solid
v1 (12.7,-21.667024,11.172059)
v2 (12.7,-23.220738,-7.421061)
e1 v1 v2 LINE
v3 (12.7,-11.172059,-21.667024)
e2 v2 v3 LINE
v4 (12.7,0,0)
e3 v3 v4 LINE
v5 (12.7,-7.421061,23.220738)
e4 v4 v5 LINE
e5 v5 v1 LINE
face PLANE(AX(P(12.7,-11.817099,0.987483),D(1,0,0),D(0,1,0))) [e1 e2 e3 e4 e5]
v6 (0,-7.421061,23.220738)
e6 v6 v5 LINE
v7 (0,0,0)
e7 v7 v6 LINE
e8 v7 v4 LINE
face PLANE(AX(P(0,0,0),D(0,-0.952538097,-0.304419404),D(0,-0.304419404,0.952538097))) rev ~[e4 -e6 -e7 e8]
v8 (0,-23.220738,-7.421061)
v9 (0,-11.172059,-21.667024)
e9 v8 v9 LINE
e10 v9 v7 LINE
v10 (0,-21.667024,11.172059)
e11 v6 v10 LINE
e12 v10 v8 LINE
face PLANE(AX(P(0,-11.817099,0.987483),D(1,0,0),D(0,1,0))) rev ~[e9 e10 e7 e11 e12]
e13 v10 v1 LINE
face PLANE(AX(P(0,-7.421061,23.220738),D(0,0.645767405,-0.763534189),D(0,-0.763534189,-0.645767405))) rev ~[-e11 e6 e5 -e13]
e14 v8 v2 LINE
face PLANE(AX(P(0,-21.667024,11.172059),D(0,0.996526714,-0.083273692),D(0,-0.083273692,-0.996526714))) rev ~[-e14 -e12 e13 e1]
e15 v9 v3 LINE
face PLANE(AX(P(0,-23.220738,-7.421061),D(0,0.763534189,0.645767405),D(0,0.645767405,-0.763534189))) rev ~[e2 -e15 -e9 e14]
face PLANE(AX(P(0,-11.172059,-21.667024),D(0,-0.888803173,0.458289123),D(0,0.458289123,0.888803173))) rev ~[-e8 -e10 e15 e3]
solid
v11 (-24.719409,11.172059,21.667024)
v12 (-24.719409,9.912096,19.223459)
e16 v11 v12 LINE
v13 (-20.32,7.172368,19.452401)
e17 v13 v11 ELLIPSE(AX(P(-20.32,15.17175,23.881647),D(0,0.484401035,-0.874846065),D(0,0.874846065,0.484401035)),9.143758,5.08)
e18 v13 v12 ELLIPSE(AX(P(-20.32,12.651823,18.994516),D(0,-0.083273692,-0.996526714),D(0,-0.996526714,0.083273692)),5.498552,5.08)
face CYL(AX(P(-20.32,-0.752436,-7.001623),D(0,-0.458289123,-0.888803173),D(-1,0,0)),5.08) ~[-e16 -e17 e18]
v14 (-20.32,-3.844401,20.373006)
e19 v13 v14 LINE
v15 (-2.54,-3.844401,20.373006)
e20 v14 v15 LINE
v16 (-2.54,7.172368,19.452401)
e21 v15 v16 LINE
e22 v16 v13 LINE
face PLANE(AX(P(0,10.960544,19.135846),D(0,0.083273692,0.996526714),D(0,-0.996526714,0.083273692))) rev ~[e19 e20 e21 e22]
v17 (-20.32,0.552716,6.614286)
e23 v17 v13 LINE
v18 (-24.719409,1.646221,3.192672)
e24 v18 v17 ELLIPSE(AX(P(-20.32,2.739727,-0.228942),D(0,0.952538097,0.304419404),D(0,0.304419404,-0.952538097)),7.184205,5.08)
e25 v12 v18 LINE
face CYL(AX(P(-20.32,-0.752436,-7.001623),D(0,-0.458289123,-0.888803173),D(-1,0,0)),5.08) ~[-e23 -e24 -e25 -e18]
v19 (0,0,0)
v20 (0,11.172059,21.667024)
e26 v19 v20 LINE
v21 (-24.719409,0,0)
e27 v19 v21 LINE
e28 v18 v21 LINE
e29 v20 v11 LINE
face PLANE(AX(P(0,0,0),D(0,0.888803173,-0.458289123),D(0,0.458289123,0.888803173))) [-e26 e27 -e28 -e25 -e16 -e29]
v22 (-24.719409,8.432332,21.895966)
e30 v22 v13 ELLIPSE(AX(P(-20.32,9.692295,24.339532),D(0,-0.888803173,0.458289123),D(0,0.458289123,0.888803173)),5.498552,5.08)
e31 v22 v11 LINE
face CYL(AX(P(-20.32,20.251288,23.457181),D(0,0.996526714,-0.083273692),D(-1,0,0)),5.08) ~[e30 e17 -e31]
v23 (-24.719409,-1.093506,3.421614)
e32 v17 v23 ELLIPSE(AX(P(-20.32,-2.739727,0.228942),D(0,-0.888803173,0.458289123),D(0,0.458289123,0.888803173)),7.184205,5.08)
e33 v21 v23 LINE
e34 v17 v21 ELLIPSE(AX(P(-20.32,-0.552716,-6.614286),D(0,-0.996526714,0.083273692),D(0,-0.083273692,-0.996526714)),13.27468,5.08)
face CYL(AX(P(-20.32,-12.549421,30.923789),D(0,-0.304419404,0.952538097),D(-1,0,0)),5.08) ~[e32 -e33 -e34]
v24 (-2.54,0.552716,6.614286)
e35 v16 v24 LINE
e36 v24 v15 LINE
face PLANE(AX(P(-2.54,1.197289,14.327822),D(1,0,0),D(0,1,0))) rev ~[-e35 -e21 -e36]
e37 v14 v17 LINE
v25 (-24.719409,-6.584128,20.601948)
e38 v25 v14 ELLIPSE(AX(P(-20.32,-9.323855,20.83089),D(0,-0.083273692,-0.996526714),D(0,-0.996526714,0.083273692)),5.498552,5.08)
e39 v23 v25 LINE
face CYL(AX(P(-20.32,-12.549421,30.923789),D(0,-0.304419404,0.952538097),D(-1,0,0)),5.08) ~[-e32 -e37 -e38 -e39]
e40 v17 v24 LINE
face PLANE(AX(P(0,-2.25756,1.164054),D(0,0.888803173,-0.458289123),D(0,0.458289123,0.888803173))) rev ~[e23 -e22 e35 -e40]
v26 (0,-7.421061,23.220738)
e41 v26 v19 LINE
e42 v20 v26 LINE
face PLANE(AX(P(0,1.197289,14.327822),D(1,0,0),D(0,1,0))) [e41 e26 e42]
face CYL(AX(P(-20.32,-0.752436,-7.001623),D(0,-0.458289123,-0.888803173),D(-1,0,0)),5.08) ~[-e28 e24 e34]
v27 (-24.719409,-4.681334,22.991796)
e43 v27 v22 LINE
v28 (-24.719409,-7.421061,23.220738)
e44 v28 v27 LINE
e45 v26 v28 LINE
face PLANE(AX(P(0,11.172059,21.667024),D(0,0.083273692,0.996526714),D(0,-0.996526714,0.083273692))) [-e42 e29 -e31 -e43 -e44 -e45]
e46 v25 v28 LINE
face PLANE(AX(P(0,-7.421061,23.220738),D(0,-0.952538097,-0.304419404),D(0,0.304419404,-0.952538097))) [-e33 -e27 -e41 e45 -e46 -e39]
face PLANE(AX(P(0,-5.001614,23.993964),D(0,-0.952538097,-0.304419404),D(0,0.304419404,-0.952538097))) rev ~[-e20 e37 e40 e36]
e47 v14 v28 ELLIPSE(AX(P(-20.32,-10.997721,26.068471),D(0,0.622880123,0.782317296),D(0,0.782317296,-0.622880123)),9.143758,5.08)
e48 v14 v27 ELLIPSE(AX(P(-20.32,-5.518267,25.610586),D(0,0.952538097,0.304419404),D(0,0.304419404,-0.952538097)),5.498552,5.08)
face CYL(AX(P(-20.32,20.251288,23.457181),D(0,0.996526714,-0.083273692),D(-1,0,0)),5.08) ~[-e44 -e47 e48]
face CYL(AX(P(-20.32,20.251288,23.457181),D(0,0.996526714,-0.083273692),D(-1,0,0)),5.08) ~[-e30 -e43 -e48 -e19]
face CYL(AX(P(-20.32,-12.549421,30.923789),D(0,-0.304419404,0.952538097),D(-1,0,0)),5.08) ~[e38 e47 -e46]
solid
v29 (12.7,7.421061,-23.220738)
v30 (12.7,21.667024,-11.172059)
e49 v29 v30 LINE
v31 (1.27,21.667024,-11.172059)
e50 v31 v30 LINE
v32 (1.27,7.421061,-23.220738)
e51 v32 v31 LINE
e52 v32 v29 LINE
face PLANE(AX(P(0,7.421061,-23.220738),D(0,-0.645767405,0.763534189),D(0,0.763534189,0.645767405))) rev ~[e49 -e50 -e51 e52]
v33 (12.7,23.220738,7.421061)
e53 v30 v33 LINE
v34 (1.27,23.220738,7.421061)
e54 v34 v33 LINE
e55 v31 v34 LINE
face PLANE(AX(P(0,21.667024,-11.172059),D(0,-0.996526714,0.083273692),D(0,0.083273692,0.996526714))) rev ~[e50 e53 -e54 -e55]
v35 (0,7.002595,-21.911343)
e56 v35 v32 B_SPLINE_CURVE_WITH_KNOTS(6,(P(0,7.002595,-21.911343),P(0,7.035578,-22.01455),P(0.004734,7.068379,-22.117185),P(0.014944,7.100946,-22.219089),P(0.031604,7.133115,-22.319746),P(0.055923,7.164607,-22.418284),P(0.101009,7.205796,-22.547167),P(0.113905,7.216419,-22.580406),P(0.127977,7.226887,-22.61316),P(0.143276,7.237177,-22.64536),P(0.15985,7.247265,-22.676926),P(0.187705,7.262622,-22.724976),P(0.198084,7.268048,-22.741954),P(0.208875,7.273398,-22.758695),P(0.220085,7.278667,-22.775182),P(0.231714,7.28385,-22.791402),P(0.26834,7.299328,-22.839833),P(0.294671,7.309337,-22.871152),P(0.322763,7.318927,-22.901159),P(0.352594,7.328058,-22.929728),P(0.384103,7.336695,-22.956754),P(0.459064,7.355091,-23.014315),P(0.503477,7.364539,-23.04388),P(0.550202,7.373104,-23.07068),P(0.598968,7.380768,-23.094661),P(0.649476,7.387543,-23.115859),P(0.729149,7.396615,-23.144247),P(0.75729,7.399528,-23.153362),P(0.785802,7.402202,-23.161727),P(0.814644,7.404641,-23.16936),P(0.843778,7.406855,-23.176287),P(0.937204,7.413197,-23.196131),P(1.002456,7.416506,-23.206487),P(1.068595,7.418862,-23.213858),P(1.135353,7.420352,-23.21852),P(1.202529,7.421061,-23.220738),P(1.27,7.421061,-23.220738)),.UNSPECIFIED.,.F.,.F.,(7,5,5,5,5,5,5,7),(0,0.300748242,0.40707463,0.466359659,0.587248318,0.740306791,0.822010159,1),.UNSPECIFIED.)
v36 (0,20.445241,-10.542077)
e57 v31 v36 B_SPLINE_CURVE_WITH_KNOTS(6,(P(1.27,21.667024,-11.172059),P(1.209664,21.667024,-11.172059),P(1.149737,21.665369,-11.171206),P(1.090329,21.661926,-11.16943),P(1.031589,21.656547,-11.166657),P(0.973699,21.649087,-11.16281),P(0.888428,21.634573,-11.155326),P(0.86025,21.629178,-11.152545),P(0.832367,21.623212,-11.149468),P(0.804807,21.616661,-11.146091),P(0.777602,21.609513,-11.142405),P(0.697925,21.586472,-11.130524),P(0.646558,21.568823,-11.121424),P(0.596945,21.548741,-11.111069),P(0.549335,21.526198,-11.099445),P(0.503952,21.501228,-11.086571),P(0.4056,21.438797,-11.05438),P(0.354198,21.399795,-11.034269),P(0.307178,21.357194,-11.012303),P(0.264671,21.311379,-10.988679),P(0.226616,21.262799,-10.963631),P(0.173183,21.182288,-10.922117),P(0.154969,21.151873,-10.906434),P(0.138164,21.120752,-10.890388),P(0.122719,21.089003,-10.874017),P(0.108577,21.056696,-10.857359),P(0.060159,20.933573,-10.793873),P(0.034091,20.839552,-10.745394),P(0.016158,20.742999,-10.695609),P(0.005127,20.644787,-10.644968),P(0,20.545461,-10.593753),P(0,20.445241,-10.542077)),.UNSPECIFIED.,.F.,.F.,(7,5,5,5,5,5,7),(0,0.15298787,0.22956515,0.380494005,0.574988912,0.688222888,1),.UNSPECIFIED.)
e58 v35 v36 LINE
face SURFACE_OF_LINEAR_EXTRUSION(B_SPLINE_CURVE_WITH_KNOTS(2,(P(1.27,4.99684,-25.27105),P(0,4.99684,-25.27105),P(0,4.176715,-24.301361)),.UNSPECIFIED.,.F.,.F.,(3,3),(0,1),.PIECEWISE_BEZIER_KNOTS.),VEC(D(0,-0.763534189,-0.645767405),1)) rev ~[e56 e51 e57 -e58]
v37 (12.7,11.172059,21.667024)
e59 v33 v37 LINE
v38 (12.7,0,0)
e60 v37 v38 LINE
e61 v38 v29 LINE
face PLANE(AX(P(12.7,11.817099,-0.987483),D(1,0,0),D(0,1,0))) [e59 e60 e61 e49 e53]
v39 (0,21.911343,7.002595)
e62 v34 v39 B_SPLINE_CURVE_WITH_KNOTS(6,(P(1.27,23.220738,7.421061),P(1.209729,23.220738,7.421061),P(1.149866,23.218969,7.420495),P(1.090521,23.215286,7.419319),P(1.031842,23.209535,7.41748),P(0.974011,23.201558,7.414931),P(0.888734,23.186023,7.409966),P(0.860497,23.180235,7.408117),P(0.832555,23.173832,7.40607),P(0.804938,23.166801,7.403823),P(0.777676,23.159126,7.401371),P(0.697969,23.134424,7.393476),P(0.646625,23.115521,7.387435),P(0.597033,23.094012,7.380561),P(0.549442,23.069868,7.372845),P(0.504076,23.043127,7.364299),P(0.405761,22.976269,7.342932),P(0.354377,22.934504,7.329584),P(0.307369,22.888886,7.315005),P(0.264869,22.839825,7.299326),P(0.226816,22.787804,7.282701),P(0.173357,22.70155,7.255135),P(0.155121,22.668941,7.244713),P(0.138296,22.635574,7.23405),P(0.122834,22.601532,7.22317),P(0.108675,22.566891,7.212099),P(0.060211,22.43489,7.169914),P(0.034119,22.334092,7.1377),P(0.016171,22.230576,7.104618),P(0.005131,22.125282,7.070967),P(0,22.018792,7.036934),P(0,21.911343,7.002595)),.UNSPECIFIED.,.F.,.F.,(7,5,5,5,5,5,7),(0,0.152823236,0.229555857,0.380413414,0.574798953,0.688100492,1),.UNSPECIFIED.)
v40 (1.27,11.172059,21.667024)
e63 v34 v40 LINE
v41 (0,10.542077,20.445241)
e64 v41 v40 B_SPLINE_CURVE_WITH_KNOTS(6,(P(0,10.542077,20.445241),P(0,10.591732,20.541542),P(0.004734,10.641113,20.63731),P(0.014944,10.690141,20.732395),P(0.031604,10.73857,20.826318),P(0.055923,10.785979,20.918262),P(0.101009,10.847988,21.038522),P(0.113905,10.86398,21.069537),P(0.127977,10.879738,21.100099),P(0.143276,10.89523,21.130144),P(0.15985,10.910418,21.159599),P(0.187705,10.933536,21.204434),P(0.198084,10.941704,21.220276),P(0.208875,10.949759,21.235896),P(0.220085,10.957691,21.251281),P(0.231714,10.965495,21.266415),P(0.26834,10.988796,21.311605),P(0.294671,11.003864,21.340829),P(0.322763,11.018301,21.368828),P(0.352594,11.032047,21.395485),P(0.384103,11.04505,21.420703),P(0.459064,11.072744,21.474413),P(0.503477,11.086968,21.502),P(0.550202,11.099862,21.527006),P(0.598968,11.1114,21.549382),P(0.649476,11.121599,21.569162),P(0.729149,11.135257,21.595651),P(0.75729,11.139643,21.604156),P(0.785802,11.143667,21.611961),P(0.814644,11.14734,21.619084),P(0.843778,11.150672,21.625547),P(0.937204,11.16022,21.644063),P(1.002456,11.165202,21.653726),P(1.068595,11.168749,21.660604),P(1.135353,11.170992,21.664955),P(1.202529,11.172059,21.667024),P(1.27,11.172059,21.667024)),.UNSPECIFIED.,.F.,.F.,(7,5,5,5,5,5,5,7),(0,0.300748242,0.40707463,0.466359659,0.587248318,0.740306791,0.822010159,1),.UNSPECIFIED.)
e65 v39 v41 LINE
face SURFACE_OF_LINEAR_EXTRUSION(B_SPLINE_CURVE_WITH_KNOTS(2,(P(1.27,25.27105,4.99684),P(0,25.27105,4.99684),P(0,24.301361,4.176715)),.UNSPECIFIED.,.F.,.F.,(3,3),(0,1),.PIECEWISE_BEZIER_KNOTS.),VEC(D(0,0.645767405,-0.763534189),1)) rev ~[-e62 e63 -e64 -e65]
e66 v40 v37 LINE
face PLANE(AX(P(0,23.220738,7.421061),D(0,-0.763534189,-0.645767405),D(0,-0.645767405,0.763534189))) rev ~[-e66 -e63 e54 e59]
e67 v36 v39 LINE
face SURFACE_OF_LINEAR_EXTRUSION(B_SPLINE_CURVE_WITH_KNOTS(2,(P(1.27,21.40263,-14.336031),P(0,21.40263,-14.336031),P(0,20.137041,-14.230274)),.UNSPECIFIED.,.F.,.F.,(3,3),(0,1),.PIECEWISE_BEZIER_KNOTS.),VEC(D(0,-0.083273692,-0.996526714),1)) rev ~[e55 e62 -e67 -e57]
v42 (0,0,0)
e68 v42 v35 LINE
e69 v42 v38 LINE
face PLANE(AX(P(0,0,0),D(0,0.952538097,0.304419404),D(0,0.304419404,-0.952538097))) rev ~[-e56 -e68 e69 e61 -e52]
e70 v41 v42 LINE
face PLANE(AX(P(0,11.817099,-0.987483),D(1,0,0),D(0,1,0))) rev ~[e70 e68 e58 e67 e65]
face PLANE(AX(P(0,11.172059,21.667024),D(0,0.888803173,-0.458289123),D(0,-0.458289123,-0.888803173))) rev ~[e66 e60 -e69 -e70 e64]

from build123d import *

# Parameters (mm, degrees)
F1_DEPTH     = 12.7
F2_DEPTH     = 25.4
F3_T1_DEPTH  = 25.0079243049
F3_T3_DEPTH  = 25.0079243049
F3_T5_DEPTH  = 25.0079243049
F4_T         = -2.54
F5_T4_DEPTH  = 36.4551670306
F5_T10_DEPTH = 39.8442718127
F5_T16_DEPTH = 39.8442718127
F5_T23_DEPTH = 36.4551670306
F5_T29_DEPTH = 39.8442718127
F5_T38_DEPTH = 36.4551670306
F5_T44_DEPTH = 39.8442718127
F5_T53_DEPTH = 39.8442718127
F5_T59_DEPTH = 39.8442718127


# Not quite as in the source:
# - a fillet or chamfer that OpenCascade refuses, or shapes differently, is made with other operations: its cross-section is extruded or revolved along the edge and cut away or added


with BuildPart() as f1:
    # F0 (on Right) → F1 (new body)
    with BuildSketch(Plane.YZ):
        Polygon((-7.4210610107, 23.220738357), (-21.6670241207, 11.1720589921), (-23.220738357, -7.4210610107), (-11.1720589921, -21.6670241207), (0, 0), align=None)
    extrude(amount=F1_DEPTH)


with BuildPart() as f1b:
    # F0 (on Right) → F1, piece 2 (new body)
    with BuildSketch(Plane.YZ):
        Polygon((23.220738357, 7.4210610107), (11.1720589921, 21.6670241207), (0, 0), (7.4210610107, -23.220738357), (21.6670241207, -11.1720589921), align=None)
    extrude(amount=F1_DEPTH)

    # F3: fillet of radius 1.27 on 3 edges, made by hand

    # F3_s2 → F3_t1 (cut)
    with BuildSketch(Plane(origin=(0, -9.5472026063, -8.074651194), x_dir=(1, 0, 0), z_dir=(0, 0.7635341894, 0.6457674052))):
        with BuildLine():
            add(Edge.make_bspline(
                [(1.27, 22.5221069513), (0, 22.5221069513), (0, 21.2521069513)],
                knots=[0, 0, 0, 1, 1, 1], degree=2, weights=[1, 1, 1]))
            Line((0, 21.2521069513), (0, 22.5221069513))
            Line((0, 22.5221069513), (1.27, 22.5221069513))
        make_face()
    extrude(amount=F3_T1_DEPTH, mode=Mode.SUBTRACT)

    # F3_s4 → F3_t3 (cut)
    with BuildSketch(Plane(origin=(0, -1.0412510893, -12.4605323193), x_dir=(1, 0, 0), z_dir=(0, 0.0832736917, 0.9965267143))):
        with BuildLine():
            add(Edge.make_bspline(
                [(1.27, 22.5221069513), (0, 22.5221069513), (0, 21.2521069513)],
                knots=[0, 0, 0, 1, 1, 1], degree=2, weights=[1, 1, 1]))
            Line((0, 21.2521069513), (0, 22.5221069513))
            Line((0, 22.5221069513), (1.27, 22.5221069513))
        make_face()
    extrude(amount=F3_T3_DEPTH, mode=Mode.SUBTRACT)

    # F3_s6 → F3_t5 (cut)
    with BuildSketch(Plane(origin=(0, 8.074651194, -9.5472026063), x_dir=(1, 0, 0), z_dir=(0, -0.6457674052, 0.7635341894))):
        with BuildLine():
            add(Edge.make_bspline(
                [(1.27, 22.5221069513), (0, 22.5221069513), (0, 21.2521069513)],
                knots=[0, 0, 0, 1, 1, 1], degree=2, weights=[1, 1, 1]))
            Line((0, 21.2521069513), (0, 22.5221069513))
            Line((0, 22.5221069513), (1.27, 22.5221069513))
        make_face()
    extrude(amount=F3_T5_DEPTH, mode=Mode.SUBTRACT)


with BuildPart() as f2:
    # F0 (on Right) → F2 (new body)
    with BuildSketch(Plane.YZ):
        Polygon((11.1720589921, 21.6670241207), (-7.4210610107, 23.220738357), (0, 0), align=None)
    extrude(amount=-F2_DEPTH)

    # F4
    f4_openings = [f2.faces().sort_by_distance(p)[0] for p in [
        (-25.4, 1.250333, 14.962587),
    ]]
    offset(amount=F4_T, openings=f4_openings)

    # F5: fillet of radius 5.08 on 3 edges, made by hand


with BuildPart() as f5_tool2:
    # F5_s3 → F5_t4 (new body)
    with BuildSketch(Plane(origin=(0, 18.1642739097, -1.5178781701), x_dir=(1, 0, 0), z_dir=(0, -0.9965267143, 0.0832736917))):
        with BuildLine():
            ThreePointArc((-25.4, 25.0621069513), (-23.9121024484, 21.4700045029), (-20.32, 19.9821069513))
            Line((-20.32, 19.9821069513), (-25.4, 19.9821069513))
            Line((-25.4, 19.9821069513), (-25.4, 25.0621069513))
        make_face()
    extrude(amount=F5_T4_DEPTH)

    split(bisect_by=Plane(origin=(0, 2.4194467666, 0.7732252864), x_dir=(1, 0, 0), z_dir=(0, 0.9525380971, 0.3044194041)), keep=Keep.TOP)

    split(bisect_by=Plane(origin=(0, -2.2575600588, 1.164054372), x_dir=(1, 0, 0), z_dir=(0, -0.8888031728, 0.4582891228)), keep=Keep.TOP)


with BuildPart() as f2_1:
    add(f2.part)

    # F5_t1: cut F5_tool2
    add(f5_tool2.part, mode=Mode.SUBTRACT)


with BuildPart() as f5_tool8:
    # F5_s9 → F5_t10 (new body)
    with BuildSketch(Plane(origin=(0, -3.0099960077, -5.8375681822), x_dir=(1, 0, 0), z_dir=(0, 0.4582891228, 0.8888031728))):
        with BuildLine():
            ThreePointArc((-25.4, 2.54), (-23.9121024484, -1.0521024484), (-20.32, -2.54))
            Line((-20.32, -2.54), (-25.4, -2.54))
            Line((-25.4, -2.54), (-25.4, 2.54))
        make_face()
    extrude(amount=F5_T10_DEPTH)

    split(bisect_by=Plane(origin=(0, 1.6639838138, 19.9127033846), x_dir=(1, 0, 0), z_dir=(0, -0.0832736917, -0.9965267143)), keep=Keep.TOP)

    split(bisect_by=Plane(origin=(0, 2.4194467666, 0.7732252864), x_dir=(1, 0, 0), z_dir=(0, 0.9525380971, 0.3044194041)), keep=Keep.TOP)


with BuildPart() as f2_2:
    add(f2_1.part)

    # F5_t7: cut F5_tool8
    add(f5_tool8.part, mode=Mode.SUBTRACT)


with BuildPart() as f5_tool14:
    # F5_s15 → F5_t16 (new body)
    with BuildSketch(Plane(origin=(0, -10.1299740234, 31.6970142166), x_dir=(1, 0, 0), z_dir=(0, 0.3044194041, -0.9525380971))):
        with BuildLine():
            ThreePointArc((-25.4, 2.54), (-23.9121024484, -1.0521024484), (-20.32, -2.54))
            Line((-20.32, -2.54), (-25.4, -2.54))
            Line((-25.4, -2.54), (-25.4, 2.54))
        make_face()
    extrude(amount=F5_T16_DEPTH)

    split(bisect_by=Plane(origin=(0, 1.6639838138, 19.9127033846), x_dir=(1, 0, 0), z_dir=(0, -0.0832736917, -0.9965267143)), keep=Keep.TOP)

    split(bisect_by=Plane(origin=(0, -2.2575600588, 1.164054372), x_dir=(1, 0, 0), z_dir=(0, -0.8888031728, 0.4582891228)), keep=Keep.TOP)


with BuildPart() as f2_3:
    add(f2_2.part)

    # F5_t13: cut F5_tool14
    add(f5_tool14.part, mode=Mode.SUBTRACT)


with BuildPart() as f5_tool21:
    # F5_s22 → F5_t23 (new body)
    with BuildSketch(Plane(origin=(0, 18.1642739097, -1.5178781701), x_dir=(1, 0, 0), z_dir=(0, -0.9965267143, 0.0832736917))):
        with BuildLine():
            ThreePointArc((-25.4, 25.0621069513), (-23.9121024484, 21.4700045029), (-20.32, 19.9821069513))
            Line((-20.32, 19.9821069513), (-25.4, 19.9821069513))
            Line((-25.4, 19.9821069513), (-25.4, 25.0621069513))
        make_face()
    extrude(amount=F5_T23_DEPTH)

    split(bisect_by=Plane(origin=(0, 1.8754989907, 22.4438812388), x_dir=(1, 0, 0), z_dir=(0, -0.0832736917, -0.9965267143)), keep=Keep.TOP)

    split(bisect_by=Plane(origin=(0, 0, 0), x_dir=(1, 0, 0), z_dir=(0, -0.8888031728, 0.4582891228)), keep=Keep.TOP)

    split(bisect_by=Plane(origin=(0, -2.2575600588, 1.164054372), x_dir=(1, 0, 0), z_dir=(0, 0.8888031728, -0.4582891228)), keep=Keep.TOP)


with BuildPart() as f5_tool27:
    # F5_s28 → F5_t29 (new body)
    with BuildSketch(Plane(origin=(0, -3.0099960077, -5.8375681822), x_dir=(1, 0, 0), z_dir=(0, 0.4582891228, 0.8888031728))):
        with BuildLine():
            ThreePointArc((-25.4, 2.54), (-23.9121024484, -1.0521024484), (-20.32, -2.54))
            Line((-20.32, -2.54), (-25.4, -2.54))
            Line((-25.4, -2.54), (-25.4, 2.54))
        make_face()
    extrude(amount=F5_T29_DEPTH)

    split(bisect_by=Plane(origin=(0, 1.8754989907, 22.4438812388), x_dir=(1, 0, 0), z_dir=(0, -0.0832736917, -0.9965267143)), keep=Keep.TOP)

    split(bisect_by=Plane(origin=(0, 0, 0), x_dir=(1, 0, 0), z_dir=(0, -0.8888031728, 0.4582891228)), keep=Keep.TOP)

    split(bisect_by=Plane(origin=(0, 1.6639838138, 19.9127033846), x_dir=(1, 0, 0), z_dir=(0, 0.0832736917, 0.9965267143)), keep=Keep.TOP)


with BuildPart() as f5_tool21_1:
    add(f5_tool21.part)

    # F5_t33: intersect F5_tool27
    add(f5_tool27.part, mode=Mode.INTERSECT)


with BuildPart() as f2_4:
    add(f2_3.part)

    # F5_t19: cut F5_tool21
    add(f5_tool21_1.part, mode=Mode.SUBTRACT)


with BuildPart() as f5_tool36:
    # F5_s37 → F5_t38 (new body)
    with BuildSketch(Plane(origin=(0, 18.1642739097, -1.5178781701), x_dir=(1, 0, 0), z_dir=(0, -0.9965267143, 0.0832736917))):
        with BuildLine():
            ThreePointArc((-25.4, 25.0621069513), (-23.9121024484, 21.4700045029), (-20.32, 19.9821069513))
            Line((-20.32, 19.9821069513), (-25.4, 19.9821069513))
            Line((-25.4, 19.9821069513), (-25.4, 25.0621069513))
        make_face()
    extrude(amount=F5_T38_DEPTH)

    split(bisect_by=Plane(origin=(0, 1.8754989907, 22.4438812388), x_dir=(1, 0, 0), z_dir=(0, -0.0832736917, -0.9965267143)), keep=Keep.TOP)

    split(bisect_by=Plane(origin=(0, 0, 0), x_dir=(1, 0, 0), z_dir=(0, 0.9525380971, 0.3044194041)), keep=Keep.TOP)

    split(bisect_by=Plane(origin=(0, 2.4194467666, 0.7732252864), x_dir=(1, 0, 0), z_dir=(0, -0.9525380971, -0.3044194041)), keep=Keep.TOP)


with BuildPart() as f5_tool42:
    # F5_s43 → F5_t44 (new body)
    with BuildSketch(Plane(origin=(0, -10.1299740234, 31.6970142166), x_dir=(1, 0, 0), z_dir=(0, 0.3044194041, -0.9525380971))):
        with BuildLine():
            ThreePointArc((-25.4, 2.54), (-23.9121024484, -1.0521024484), (-20.32, -2.54))
            Line((-20.32, -2.54), (-25.4, -2.54))
            Line((-25.4, -2.54), (-25.4, 2.54))
        make_face()
    extrude(amount=F5_T44_DEPTH)

    split(bisect_by=Plane(origin=(0, 1.8754989907, 22.4438812388), x_dir=(1, 0, 0), z_dir=(0, -0.0832736917, -0.9965267143)), keep=Keep.TOP)

    split(bisect_by=Plane(origin=(0, 0, 0), x_dir=(1, 0, 0), z_dir=(0, 0.9525380971, 0.3044194041)), keep=Keep.TOP)

    split(bisect_by=Plane(origin=(0, 1.6639838138, 19.9127033846), x_dir=(1, 0, 0), z_dir=(0, 0.0832736917, 0.9965267143)), keep=Keep.TOP)


with BuildPart() as f5_tool36_1:
    add(f5_tool36.part)

    # F5_t48: intersect F5_tool42
    add(f5_tool42.part, mode=Mode.INTERSECT)


with BuildPart() as f2_5:
    add(f2_4.part)

    # F5_t34: cut F5_tool36
    add(f5_tool36_1.part, mode=Mode.SUBTRACT)


with BuildPart() as f5_tool51:
    # F5_s52 → F5_t53 (new body)
    with BuildSketch(Plane(origin=(0, -3.0099960077, -5.8375681822), x_dir=(1, 0, 0), z_dir=(0, 0.4582891228, 0.8888031728))):
        with BuildLine():
            ThreePointArc((-25.4, 2.54), (-23.9121024484, -1.0521024484), (-20.32, -2.54))
            Line((-20.32, -2.54), (-25.4, -2.54))
            Line((-25.4, -2.54), (-25.4, 2.54))
        make_face()
    extrude(amount=F5_T53_DEPTH)

    split(bisect_by=Plane(origin=(0, 0, 0), x_dir=(1, 0, 0), z_dir=(0, 0.9525380971, 0.3044194041)), keep=Keep.TOP)

    split(bisect_by=Plane(origin=(0, 0, 0), x_dir=(1, 0, 0), z_dir=(0, -0.8888031728, 0.4582891228)), keep=Keep.TOP)

    split(bisect_by=Plane(origin=(0, 2.4194467666, 0.7732252864), x_dir=(1, 0, 0), z_dir=(0, -0.9525380971, -0.3044194041)), keep=Keep.TOP)


with BuildPart() as f5_tool57:
    # F5_s58 → F5_t59 (new body)
    with BuildSketch(Plane(origin=(0, -10.1299740234, 31.6970142166), x_dir=(1, 0, 0), z_dir=(0, 0.3044194041, -0.9525380971))):
        with BuildLine():
            ThreePointArc((-25.4, 2.54), (-23.9121024484, -1.0521024484), (-20.32, -2.54))
            Line((-20.32, -2.54), (-25.4, -2.54))
            Line((-25.4, -2.54), (-25.4, 2.54))
        make_face()
    extrude(amount=F5_T59_DEPTH)

    split(bisect_by=Plane(origin=(0, 0, 0), x_dir=(1, 0, 0), z_dir=(0, 0.9525380971, 0.3044194041)), keep=Keep.TOP)

    split(bisect_by=Plane(origin=(0, 0, 0), x_dir=(1, 0, 0), z_dir=(0, -0.8888031728, 0.4582891228)), keep=Keep.TOP)

    split(bisect_by=Plane(origin=(0, -2.2575600588, 1.164054372), x_dir=(1, 0, 0), z_dir=(0, 0.8888031728, -0.4582891228)), keep=Keep.TOP)


with BuildPart() as f5_tool51_1:
    add(f5_tool51.part)

    # F5_t63: intersect F5_tool57
    add(f5_tool57.part, mode=Mode.INTERSECT)


with BuildPart() as f2_6:
    add(f2_5.part)

    # F5_t49: cut F5_tool51
    add(f5_tool51_1.part, mode=Mode.SUBTRACT)


solid = Compound([f1.part, f1b.part, f2_6.part])
